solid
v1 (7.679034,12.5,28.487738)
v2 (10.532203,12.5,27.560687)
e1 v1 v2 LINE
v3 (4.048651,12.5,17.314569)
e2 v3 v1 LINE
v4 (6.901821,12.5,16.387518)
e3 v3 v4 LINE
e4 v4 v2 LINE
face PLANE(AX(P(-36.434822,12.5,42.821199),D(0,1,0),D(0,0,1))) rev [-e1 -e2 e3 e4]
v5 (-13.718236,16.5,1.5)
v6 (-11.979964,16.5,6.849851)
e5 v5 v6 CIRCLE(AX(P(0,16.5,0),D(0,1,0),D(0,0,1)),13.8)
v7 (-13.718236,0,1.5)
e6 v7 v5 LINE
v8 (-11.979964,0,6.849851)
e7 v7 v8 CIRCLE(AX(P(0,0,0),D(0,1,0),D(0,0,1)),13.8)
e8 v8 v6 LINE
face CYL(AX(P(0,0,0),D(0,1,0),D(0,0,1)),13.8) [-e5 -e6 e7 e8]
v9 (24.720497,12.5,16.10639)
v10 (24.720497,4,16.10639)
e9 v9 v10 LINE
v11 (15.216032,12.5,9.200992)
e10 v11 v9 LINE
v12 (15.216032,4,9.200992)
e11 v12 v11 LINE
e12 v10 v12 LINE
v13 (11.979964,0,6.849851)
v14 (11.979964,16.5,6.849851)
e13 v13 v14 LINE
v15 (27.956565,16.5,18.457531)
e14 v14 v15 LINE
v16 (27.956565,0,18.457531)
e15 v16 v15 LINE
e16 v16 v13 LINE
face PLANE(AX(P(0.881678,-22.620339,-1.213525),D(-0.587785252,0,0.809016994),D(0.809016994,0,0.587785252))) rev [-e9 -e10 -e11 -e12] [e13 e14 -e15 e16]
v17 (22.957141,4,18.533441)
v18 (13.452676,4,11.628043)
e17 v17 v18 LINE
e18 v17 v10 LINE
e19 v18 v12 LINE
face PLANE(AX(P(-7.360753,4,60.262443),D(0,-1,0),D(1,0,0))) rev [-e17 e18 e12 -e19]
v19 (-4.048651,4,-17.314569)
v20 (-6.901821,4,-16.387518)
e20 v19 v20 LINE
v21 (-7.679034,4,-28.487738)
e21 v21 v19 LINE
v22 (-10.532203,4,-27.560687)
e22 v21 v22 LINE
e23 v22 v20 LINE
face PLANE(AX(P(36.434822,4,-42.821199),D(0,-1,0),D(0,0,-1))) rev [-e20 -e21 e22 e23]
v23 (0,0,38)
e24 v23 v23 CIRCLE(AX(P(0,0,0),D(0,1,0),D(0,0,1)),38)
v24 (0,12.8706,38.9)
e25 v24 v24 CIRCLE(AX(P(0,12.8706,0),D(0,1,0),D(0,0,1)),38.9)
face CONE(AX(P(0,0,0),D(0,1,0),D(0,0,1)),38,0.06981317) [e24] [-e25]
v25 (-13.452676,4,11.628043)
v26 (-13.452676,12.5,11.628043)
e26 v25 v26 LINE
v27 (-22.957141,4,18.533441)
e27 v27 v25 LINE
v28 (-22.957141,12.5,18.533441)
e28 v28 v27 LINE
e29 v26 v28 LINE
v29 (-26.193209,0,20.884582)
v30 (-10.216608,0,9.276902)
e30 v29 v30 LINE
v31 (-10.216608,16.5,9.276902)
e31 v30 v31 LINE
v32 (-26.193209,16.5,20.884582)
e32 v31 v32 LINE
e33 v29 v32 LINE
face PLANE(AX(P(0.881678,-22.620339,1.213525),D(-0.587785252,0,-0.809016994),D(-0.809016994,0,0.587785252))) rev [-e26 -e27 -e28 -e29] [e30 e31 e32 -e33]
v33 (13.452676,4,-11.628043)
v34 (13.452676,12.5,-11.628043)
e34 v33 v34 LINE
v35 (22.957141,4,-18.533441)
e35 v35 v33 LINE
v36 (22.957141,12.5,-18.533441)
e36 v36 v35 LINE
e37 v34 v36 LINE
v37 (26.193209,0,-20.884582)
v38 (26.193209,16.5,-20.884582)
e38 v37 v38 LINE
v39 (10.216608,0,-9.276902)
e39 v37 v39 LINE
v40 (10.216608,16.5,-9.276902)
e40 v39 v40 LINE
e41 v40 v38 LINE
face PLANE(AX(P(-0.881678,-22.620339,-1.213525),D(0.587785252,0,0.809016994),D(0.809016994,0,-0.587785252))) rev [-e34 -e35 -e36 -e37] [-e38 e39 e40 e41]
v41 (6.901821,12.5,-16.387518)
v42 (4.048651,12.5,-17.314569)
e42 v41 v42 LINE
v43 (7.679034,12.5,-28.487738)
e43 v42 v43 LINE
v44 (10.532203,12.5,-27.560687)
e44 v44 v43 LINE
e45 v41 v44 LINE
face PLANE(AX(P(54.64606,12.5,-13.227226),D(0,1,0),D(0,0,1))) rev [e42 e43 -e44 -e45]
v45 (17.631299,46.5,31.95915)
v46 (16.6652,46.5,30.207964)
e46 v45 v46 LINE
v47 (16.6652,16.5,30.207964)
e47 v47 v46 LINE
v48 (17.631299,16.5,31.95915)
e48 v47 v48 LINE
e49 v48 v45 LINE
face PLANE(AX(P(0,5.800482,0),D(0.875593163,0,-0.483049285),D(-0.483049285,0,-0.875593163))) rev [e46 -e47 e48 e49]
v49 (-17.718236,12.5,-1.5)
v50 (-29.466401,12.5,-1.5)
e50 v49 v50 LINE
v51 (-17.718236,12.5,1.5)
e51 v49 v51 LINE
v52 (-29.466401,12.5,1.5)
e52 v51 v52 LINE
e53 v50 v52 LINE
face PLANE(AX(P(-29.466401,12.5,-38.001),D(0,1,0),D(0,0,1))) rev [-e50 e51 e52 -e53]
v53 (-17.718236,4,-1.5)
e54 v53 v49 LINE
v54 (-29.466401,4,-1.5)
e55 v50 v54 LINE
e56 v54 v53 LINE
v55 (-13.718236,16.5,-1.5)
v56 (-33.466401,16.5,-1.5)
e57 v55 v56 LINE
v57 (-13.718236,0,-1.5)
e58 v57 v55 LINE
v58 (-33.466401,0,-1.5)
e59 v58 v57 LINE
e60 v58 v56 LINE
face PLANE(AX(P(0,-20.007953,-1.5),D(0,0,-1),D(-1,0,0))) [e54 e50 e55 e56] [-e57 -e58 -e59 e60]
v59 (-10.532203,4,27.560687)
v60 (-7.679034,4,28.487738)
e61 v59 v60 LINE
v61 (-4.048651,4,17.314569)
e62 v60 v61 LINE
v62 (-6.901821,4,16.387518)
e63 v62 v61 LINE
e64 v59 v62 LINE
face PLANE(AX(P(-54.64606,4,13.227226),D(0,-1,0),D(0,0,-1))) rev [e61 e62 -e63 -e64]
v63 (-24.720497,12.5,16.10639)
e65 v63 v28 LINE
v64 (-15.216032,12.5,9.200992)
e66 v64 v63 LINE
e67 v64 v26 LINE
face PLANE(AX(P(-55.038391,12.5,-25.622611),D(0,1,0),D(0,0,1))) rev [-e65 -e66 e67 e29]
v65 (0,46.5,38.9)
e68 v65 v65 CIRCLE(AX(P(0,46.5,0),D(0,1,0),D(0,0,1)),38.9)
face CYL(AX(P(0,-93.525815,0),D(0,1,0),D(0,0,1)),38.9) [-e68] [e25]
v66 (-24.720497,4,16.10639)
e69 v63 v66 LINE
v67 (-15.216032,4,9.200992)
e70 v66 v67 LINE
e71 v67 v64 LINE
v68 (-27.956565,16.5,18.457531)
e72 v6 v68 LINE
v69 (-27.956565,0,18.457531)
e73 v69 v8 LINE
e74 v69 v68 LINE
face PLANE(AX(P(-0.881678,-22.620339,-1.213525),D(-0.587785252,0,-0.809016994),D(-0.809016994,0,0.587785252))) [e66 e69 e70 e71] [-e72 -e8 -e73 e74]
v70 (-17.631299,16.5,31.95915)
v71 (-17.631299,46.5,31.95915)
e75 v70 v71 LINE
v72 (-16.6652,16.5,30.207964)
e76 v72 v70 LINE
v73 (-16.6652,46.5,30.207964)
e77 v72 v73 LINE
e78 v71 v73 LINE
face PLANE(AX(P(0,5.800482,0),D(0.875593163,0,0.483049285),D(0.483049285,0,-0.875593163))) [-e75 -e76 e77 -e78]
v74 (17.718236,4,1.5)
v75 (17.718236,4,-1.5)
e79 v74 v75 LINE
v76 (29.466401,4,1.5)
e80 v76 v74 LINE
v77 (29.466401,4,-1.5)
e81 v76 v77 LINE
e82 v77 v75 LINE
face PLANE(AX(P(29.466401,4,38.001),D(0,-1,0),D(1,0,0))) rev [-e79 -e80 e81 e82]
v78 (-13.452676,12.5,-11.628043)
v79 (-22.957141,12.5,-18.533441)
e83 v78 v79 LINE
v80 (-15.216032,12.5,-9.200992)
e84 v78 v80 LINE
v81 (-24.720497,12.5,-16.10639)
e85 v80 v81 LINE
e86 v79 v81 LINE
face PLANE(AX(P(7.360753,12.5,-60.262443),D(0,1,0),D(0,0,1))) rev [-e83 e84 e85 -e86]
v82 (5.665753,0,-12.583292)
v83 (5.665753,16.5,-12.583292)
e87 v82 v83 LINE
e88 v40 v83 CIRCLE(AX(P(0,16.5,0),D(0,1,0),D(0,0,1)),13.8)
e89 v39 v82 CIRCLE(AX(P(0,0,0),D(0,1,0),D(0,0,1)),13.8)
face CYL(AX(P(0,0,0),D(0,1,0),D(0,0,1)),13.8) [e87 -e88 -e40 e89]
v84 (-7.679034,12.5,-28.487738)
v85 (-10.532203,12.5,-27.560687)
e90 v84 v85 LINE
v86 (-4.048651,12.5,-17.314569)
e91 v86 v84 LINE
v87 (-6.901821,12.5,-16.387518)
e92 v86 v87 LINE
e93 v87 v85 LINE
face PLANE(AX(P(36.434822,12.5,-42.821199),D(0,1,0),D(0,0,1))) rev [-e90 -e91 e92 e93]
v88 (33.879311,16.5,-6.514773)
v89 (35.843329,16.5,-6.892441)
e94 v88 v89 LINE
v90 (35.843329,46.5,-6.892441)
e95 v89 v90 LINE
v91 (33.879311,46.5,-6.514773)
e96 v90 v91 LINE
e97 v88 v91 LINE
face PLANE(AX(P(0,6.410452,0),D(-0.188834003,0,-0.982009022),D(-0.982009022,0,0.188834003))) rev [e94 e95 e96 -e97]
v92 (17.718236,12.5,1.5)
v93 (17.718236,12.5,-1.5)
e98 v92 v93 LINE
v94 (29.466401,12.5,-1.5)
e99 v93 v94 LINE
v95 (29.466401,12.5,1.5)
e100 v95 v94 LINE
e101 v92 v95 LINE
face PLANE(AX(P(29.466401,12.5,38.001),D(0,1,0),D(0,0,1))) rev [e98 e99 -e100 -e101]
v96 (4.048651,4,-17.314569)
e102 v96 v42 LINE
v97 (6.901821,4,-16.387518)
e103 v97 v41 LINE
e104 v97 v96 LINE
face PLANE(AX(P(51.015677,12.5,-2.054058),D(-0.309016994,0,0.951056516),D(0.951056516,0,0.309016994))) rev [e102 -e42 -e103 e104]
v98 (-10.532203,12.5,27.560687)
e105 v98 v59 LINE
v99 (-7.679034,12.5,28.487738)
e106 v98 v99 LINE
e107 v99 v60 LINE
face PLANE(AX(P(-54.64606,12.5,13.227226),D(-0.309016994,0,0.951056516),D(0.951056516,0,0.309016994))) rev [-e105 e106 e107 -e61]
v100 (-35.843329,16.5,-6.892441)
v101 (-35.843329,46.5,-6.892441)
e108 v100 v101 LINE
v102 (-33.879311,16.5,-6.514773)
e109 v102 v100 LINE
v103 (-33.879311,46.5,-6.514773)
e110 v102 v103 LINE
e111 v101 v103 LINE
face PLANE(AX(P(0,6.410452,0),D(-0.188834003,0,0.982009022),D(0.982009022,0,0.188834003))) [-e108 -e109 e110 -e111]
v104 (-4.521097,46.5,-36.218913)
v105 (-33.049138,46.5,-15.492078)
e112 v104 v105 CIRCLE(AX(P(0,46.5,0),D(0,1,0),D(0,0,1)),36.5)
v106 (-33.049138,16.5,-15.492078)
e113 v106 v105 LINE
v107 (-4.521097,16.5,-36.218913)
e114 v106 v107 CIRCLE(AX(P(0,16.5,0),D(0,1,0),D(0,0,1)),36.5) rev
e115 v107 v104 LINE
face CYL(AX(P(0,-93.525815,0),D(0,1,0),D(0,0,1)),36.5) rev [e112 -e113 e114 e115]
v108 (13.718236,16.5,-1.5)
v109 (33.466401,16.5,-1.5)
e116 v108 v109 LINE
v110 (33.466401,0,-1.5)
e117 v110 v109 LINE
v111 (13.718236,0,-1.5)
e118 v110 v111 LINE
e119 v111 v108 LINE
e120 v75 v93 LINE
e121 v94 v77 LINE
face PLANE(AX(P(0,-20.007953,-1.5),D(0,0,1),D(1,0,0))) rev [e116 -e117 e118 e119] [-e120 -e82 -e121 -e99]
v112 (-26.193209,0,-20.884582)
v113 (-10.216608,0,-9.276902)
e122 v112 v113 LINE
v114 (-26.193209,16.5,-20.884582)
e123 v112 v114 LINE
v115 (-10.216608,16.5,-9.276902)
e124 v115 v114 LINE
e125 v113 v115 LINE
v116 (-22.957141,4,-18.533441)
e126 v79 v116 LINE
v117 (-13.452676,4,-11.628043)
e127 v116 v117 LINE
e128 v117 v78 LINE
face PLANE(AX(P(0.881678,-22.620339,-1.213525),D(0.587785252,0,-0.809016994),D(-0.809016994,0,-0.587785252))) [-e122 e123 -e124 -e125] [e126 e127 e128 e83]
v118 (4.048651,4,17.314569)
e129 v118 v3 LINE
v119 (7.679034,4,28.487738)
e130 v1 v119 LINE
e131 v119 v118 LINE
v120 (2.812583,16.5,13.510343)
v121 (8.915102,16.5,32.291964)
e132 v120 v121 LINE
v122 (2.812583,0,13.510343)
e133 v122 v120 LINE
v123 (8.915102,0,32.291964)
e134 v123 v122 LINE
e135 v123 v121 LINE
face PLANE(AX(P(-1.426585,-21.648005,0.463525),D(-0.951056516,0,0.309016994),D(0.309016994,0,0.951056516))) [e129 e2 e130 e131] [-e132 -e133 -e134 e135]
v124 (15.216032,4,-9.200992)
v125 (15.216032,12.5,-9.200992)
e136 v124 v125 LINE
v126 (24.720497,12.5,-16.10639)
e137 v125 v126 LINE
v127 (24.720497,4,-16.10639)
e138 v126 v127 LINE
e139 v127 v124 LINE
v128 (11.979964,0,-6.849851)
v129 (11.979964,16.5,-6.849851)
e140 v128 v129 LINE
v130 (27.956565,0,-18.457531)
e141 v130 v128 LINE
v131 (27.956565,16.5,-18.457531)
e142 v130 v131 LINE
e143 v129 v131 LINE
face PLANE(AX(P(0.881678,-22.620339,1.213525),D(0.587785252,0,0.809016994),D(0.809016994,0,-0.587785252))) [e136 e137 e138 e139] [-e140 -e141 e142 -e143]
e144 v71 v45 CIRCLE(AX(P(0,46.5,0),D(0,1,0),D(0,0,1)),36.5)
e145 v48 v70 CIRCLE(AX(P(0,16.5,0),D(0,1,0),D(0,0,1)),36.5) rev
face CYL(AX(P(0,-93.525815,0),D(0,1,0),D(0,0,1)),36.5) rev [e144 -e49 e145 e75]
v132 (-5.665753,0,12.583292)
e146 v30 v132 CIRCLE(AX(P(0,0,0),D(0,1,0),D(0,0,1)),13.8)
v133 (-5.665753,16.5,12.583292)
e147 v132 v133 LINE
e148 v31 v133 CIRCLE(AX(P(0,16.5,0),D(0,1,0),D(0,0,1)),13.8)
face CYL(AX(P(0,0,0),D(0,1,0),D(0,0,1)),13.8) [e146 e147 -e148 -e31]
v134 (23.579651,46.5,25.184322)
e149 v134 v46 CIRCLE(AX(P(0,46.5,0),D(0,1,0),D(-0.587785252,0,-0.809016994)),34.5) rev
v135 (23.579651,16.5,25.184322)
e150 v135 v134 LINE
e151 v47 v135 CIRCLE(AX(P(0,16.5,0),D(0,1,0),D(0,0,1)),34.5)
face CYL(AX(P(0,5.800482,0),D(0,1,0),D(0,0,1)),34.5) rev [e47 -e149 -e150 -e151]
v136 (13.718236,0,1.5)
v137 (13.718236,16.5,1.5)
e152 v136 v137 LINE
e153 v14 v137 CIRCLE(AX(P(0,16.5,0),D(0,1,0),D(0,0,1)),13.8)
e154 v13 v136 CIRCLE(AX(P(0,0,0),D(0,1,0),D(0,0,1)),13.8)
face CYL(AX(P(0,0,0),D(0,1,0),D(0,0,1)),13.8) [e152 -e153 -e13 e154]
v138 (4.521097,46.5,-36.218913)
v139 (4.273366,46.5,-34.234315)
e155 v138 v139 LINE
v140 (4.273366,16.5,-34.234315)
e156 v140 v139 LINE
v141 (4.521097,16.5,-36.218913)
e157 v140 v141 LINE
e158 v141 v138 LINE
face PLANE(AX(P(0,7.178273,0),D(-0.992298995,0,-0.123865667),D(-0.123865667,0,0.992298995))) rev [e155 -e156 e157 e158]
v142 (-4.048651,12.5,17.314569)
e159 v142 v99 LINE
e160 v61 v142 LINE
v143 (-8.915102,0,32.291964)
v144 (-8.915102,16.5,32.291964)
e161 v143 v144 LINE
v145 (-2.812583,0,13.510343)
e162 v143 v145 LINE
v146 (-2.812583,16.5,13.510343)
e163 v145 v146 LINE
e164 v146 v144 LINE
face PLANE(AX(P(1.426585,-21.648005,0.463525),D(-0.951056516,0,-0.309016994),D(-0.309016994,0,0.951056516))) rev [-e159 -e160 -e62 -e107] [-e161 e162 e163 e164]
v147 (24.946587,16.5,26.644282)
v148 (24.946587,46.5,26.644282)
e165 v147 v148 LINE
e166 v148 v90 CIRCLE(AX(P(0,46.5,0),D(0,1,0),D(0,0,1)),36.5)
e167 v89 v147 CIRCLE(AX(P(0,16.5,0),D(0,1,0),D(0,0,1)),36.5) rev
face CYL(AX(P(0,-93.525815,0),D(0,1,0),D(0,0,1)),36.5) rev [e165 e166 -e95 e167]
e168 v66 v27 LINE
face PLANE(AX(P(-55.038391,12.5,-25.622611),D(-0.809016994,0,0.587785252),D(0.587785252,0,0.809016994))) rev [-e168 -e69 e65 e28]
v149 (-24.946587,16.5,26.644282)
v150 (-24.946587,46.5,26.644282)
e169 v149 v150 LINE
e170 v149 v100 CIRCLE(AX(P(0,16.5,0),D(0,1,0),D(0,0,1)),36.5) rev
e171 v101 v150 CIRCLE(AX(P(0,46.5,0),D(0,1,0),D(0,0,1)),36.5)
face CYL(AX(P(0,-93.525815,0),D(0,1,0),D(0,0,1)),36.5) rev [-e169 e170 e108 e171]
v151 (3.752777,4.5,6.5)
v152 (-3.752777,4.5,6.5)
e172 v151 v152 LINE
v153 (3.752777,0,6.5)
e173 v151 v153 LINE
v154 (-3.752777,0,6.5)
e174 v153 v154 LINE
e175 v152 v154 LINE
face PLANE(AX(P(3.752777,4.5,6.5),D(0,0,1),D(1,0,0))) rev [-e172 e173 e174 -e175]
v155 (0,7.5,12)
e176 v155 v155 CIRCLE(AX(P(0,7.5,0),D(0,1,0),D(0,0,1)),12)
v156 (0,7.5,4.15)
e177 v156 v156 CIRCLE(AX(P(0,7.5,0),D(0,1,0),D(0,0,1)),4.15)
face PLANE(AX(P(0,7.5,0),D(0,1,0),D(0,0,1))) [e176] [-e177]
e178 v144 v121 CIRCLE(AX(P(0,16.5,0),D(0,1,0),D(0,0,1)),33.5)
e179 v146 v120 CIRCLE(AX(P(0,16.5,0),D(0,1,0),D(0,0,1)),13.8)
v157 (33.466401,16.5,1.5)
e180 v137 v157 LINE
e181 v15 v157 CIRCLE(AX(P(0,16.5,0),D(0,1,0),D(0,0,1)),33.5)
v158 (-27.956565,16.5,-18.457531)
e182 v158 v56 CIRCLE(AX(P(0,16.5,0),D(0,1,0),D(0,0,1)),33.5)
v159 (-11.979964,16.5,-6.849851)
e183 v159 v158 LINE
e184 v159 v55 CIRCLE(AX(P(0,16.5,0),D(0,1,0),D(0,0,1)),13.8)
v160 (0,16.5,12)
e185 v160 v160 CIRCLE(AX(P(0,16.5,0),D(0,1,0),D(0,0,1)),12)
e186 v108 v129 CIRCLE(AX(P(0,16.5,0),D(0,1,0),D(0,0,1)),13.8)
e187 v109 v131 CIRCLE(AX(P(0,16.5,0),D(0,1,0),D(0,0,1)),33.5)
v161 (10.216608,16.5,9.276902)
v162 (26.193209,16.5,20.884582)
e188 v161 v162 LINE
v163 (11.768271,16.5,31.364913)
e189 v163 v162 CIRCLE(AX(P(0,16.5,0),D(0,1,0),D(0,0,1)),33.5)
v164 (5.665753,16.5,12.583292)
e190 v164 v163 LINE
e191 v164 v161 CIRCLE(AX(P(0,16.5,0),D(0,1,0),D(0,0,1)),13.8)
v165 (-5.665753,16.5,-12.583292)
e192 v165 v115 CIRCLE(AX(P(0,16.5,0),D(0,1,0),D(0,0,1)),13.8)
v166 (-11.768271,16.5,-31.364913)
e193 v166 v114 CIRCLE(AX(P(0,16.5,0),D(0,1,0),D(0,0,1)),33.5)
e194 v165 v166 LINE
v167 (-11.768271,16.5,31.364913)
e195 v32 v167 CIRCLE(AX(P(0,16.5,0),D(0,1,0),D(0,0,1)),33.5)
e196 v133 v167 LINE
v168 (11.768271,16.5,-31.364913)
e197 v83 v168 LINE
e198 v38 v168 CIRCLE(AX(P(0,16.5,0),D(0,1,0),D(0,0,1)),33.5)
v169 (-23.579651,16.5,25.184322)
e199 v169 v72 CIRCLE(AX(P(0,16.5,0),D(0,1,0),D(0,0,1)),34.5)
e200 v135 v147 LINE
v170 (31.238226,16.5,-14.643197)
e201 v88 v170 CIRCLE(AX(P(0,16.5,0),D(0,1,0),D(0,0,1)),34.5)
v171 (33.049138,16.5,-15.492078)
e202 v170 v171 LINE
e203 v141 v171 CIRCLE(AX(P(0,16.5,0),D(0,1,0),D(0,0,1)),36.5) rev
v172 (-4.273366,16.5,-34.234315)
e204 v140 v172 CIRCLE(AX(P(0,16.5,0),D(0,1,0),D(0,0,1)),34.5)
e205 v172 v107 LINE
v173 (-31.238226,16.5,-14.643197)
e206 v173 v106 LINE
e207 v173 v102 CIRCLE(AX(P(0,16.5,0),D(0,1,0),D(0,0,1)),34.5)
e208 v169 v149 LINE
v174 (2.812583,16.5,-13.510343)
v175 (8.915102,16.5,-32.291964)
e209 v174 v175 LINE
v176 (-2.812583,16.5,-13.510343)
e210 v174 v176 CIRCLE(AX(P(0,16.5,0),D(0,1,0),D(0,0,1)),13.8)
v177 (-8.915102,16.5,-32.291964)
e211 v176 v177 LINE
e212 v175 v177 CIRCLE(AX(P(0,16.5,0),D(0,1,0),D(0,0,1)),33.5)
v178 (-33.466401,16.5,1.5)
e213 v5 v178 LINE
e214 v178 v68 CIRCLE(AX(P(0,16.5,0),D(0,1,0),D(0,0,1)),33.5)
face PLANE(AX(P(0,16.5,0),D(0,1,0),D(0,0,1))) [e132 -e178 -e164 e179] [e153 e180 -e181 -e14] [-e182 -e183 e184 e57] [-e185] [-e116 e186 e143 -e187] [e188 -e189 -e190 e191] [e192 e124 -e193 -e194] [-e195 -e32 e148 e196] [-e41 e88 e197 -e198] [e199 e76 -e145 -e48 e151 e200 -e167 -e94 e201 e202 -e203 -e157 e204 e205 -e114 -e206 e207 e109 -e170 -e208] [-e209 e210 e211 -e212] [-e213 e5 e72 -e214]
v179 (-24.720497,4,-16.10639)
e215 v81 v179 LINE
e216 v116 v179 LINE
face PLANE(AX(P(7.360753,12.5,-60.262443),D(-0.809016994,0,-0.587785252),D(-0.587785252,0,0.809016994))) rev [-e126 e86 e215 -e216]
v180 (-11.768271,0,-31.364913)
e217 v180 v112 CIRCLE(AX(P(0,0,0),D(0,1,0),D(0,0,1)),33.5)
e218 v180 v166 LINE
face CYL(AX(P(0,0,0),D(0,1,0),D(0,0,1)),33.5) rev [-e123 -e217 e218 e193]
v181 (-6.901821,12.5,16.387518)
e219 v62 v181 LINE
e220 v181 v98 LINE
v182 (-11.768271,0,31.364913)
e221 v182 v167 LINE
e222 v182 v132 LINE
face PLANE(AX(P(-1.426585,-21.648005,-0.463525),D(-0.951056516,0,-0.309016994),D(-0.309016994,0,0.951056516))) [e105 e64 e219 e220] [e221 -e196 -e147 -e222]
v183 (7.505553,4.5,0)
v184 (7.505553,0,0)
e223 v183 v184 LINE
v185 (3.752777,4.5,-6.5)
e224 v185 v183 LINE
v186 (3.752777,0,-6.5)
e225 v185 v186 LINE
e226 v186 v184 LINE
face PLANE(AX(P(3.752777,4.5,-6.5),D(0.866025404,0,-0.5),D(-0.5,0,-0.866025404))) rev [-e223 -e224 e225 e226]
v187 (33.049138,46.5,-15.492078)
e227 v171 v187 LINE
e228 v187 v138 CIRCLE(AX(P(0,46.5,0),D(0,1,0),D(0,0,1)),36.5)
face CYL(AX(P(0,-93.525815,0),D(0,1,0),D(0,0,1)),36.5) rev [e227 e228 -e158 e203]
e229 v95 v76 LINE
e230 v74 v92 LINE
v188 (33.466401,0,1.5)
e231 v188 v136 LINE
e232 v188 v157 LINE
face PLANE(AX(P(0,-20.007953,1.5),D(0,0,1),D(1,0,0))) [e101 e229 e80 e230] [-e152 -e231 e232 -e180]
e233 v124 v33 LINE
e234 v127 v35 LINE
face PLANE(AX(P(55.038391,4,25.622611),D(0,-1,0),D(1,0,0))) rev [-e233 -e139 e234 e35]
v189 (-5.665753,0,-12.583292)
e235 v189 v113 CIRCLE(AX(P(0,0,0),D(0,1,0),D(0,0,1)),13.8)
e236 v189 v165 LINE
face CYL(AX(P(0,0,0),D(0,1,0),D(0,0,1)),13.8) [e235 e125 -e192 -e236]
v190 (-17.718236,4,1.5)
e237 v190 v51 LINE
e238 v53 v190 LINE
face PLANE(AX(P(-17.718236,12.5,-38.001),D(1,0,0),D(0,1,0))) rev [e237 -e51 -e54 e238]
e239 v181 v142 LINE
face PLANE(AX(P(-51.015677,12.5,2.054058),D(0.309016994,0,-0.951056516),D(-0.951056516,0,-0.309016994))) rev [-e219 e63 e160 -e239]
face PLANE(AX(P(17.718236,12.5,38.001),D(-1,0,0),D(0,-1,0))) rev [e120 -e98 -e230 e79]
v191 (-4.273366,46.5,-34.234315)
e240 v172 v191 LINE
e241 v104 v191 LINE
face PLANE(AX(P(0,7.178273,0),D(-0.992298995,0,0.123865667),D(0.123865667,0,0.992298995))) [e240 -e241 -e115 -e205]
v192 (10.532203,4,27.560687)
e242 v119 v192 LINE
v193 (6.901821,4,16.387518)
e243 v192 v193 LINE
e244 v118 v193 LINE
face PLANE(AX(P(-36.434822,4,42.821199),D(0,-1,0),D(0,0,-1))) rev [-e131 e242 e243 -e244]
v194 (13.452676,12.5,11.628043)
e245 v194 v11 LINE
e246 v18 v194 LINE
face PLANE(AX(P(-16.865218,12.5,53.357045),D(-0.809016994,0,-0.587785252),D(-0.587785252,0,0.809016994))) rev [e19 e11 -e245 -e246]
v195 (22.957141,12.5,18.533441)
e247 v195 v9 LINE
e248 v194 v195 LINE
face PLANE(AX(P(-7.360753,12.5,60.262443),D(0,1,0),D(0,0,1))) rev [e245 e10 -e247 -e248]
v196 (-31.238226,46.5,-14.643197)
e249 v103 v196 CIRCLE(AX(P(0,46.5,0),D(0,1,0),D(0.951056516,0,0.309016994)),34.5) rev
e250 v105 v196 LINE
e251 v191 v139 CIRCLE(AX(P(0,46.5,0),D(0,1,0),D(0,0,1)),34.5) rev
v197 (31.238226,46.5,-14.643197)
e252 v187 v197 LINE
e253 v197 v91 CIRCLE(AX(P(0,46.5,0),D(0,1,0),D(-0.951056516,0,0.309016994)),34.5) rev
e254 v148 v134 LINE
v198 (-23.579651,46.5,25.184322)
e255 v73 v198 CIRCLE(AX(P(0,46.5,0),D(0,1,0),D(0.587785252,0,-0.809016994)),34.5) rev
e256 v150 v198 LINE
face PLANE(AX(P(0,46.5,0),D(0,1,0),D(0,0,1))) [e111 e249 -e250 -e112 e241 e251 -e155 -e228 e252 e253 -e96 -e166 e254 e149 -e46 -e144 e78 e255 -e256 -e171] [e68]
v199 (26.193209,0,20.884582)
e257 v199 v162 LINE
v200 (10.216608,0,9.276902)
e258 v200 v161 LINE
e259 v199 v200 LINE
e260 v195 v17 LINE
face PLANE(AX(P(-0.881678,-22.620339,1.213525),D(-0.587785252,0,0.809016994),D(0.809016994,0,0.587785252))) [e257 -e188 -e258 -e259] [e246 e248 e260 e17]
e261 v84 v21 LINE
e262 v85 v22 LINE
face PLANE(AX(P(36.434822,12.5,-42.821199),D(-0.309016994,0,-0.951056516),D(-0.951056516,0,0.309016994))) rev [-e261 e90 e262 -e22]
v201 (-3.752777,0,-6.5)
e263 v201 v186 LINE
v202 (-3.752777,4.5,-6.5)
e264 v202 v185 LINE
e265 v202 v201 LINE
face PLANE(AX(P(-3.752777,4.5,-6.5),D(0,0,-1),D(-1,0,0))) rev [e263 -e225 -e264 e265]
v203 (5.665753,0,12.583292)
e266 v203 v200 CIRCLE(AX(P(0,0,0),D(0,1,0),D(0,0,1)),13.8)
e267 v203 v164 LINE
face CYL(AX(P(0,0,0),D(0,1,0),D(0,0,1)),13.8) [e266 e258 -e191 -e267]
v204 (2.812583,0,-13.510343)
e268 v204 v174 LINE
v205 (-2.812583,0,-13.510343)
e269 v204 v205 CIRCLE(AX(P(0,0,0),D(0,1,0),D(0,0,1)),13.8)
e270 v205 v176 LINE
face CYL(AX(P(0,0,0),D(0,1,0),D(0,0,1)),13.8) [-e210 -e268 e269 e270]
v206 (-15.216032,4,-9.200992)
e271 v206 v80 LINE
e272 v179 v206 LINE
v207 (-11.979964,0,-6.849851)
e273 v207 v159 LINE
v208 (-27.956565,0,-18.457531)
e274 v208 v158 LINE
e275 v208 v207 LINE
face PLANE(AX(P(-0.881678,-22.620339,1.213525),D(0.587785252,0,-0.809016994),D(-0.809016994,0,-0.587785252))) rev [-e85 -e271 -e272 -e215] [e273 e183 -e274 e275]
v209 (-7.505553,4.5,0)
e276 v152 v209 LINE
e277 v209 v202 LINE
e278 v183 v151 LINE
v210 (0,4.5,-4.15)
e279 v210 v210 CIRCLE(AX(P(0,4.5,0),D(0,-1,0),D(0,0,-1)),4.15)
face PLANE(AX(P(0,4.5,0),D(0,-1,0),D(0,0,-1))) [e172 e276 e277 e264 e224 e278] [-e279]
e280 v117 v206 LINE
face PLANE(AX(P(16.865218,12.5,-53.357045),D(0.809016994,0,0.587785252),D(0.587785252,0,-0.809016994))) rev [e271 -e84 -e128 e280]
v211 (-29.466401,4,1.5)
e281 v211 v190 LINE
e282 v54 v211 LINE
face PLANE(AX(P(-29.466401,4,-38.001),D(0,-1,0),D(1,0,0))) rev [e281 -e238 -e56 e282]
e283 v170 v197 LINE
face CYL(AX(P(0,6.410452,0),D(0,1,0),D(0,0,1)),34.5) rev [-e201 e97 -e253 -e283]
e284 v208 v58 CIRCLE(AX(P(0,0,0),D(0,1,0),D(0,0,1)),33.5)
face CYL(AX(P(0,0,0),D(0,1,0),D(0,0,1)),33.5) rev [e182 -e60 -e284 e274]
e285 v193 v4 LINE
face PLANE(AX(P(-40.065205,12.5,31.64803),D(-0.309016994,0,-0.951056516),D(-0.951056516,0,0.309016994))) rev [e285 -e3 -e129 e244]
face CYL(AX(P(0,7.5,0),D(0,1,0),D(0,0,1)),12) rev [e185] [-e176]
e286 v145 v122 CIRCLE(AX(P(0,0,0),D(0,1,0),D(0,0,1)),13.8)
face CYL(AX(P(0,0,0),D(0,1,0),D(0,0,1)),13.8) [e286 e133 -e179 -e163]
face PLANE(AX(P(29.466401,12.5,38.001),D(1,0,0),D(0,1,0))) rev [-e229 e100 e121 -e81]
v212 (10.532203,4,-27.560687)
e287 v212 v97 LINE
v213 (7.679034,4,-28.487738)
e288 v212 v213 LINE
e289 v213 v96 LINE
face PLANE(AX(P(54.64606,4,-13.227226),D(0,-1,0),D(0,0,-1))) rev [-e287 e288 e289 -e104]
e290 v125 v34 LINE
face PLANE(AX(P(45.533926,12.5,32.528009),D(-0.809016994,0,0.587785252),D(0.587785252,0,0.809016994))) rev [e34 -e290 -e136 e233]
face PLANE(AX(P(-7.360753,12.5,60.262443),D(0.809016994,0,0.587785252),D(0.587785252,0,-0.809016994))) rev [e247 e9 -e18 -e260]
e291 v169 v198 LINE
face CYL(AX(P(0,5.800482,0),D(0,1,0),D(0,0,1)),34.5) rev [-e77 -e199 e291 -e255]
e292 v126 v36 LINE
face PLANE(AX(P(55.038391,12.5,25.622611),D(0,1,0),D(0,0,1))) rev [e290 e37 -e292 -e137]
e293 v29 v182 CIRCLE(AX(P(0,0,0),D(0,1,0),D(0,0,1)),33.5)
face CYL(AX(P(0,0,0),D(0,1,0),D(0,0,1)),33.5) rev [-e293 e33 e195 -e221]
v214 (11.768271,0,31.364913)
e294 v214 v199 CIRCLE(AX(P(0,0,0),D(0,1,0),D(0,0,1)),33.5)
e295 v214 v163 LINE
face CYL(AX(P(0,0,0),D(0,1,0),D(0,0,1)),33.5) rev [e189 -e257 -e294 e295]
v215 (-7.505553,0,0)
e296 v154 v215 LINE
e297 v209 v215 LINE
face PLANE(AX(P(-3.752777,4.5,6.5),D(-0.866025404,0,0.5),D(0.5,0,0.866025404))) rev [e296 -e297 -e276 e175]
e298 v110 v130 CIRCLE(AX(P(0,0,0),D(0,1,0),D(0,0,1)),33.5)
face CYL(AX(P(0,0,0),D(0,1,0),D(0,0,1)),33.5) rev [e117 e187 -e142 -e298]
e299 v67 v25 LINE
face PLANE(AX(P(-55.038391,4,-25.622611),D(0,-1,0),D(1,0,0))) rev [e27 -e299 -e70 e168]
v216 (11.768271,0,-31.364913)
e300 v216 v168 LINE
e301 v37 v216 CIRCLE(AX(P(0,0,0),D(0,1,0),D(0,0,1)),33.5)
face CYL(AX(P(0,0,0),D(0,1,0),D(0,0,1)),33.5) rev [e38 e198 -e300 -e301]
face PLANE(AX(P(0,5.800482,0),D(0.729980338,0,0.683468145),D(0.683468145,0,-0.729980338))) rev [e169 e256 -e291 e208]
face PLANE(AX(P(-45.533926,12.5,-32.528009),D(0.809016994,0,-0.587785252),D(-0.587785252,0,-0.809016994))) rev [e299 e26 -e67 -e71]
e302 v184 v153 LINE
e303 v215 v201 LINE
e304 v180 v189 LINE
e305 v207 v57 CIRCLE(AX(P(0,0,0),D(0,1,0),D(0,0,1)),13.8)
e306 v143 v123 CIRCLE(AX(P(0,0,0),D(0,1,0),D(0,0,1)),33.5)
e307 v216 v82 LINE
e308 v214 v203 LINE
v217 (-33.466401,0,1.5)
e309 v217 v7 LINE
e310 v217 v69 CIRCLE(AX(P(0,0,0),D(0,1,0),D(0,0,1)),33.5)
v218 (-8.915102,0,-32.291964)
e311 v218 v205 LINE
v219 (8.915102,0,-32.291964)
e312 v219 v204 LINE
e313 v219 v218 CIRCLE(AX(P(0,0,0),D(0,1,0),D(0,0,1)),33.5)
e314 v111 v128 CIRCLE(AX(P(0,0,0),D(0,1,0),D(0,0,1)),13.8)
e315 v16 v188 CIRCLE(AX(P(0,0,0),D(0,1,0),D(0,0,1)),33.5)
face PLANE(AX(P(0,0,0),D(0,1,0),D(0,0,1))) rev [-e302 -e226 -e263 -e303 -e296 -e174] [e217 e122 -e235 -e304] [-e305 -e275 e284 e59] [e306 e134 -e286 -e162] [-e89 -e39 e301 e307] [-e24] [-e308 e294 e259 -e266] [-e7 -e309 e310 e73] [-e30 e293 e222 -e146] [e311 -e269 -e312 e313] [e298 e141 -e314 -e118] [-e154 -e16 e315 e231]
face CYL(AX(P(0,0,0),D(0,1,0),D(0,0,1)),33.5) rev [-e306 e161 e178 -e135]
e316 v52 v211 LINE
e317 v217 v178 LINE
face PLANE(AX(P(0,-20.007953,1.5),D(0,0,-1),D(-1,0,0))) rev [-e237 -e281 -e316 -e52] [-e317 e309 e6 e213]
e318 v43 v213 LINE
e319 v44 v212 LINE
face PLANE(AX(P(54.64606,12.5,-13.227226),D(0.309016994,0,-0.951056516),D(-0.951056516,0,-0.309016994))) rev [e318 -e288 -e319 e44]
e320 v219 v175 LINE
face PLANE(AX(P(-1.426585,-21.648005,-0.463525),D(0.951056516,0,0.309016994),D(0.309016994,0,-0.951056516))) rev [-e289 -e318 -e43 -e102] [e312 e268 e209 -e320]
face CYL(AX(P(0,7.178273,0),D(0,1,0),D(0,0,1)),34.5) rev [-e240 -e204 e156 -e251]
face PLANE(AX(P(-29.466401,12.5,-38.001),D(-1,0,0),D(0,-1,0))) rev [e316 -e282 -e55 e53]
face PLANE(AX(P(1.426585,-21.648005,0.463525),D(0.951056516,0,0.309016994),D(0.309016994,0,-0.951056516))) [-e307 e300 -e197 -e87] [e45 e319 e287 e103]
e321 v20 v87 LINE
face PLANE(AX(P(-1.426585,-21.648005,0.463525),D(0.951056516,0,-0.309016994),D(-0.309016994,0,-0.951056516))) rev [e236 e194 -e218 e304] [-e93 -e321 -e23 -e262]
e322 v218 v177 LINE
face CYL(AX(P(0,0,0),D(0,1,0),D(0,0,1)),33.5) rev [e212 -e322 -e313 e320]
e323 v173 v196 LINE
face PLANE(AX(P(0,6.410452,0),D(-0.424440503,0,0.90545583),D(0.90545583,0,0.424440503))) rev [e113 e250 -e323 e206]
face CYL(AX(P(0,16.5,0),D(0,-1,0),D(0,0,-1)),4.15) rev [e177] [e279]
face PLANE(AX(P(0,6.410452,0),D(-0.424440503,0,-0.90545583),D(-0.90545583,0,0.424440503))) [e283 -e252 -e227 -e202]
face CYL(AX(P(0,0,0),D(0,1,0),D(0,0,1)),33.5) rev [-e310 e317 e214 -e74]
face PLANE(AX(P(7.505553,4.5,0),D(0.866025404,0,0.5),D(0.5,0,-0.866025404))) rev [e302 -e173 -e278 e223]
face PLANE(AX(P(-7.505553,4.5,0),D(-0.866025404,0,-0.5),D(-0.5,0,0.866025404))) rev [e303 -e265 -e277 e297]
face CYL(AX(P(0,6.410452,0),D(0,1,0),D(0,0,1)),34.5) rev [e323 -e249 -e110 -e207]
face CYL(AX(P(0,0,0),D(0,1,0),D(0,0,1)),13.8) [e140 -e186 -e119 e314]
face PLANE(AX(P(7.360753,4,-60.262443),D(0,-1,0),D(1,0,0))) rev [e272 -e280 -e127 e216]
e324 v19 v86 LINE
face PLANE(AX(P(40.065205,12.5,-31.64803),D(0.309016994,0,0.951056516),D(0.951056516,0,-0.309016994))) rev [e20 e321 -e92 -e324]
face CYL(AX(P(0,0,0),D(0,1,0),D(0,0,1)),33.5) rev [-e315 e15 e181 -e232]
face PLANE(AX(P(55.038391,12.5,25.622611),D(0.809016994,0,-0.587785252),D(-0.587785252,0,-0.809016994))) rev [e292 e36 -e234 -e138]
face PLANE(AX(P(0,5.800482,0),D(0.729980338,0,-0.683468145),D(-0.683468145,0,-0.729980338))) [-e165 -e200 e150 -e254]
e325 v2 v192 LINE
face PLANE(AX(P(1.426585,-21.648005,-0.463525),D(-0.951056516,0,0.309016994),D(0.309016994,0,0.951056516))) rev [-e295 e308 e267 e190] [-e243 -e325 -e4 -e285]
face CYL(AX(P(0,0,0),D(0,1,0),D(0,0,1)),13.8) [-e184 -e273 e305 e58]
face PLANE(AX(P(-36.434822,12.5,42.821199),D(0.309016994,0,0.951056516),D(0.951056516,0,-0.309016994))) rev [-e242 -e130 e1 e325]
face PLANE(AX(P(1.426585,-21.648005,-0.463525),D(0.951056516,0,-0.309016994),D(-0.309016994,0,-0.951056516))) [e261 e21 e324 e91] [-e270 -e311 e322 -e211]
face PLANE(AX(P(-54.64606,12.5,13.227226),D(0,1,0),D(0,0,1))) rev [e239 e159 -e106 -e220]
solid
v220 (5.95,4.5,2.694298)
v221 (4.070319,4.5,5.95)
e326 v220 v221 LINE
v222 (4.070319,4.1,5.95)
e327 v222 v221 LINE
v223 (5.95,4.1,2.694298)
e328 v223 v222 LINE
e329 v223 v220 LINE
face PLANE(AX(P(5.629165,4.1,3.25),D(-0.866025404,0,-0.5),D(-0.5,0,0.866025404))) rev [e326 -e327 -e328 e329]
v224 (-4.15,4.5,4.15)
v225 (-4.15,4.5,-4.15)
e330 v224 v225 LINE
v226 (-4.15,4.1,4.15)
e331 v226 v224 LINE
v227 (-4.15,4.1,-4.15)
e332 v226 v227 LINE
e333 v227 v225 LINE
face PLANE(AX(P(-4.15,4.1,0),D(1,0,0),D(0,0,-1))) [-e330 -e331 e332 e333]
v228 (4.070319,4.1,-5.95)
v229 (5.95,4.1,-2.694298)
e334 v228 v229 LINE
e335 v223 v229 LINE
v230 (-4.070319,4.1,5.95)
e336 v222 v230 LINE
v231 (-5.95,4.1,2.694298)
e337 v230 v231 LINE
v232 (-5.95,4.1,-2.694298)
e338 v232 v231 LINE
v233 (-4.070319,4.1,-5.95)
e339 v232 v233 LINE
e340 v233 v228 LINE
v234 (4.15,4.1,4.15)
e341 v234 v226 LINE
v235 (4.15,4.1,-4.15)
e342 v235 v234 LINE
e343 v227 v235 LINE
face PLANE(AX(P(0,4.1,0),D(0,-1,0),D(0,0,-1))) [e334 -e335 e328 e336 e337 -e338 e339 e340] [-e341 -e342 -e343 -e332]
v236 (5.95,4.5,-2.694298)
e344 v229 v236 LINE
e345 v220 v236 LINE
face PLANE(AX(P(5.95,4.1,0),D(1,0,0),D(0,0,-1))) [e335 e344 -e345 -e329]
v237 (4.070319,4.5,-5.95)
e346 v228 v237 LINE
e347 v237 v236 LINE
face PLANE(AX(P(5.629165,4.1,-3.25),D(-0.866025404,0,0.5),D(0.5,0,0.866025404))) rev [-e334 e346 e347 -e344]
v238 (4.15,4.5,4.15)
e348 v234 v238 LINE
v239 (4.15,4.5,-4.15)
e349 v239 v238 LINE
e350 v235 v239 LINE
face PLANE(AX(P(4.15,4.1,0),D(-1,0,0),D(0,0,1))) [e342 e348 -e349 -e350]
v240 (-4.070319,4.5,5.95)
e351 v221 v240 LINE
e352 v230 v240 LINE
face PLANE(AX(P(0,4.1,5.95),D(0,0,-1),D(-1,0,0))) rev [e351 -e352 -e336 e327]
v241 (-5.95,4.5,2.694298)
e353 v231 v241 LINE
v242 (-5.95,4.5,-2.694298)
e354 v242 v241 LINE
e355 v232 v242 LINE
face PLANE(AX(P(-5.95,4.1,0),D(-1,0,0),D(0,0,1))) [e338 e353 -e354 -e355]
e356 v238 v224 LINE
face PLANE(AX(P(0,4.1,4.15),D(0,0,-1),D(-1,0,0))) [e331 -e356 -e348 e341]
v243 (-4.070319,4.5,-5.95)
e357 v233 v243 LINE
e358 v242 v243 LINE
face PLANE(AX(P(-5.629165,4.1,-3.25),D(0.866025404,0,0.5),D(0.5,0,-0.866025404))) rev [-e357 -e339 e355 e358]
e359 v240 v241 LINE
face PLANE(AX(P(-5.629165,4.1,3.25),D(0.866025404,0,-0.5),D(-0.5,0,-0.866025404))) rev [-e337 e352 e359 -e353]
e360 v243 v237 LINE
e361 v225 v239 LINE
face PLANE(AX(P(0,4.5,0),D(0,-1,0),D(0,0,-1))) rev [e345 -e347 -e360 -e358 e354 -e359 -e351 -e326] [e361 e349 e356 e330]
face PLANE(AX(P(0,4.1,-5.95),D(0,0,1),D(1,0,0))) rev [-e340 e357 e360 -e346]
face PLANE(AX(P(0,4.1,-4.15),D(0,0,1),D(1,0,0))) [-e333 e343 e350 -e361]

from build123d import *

# Parameters (mm, degrees)
BOSS_EXTRUDE1_DEPTH    = 16.5
SKETCH1_3_R            = 38
BOSS_EXTRUDE2_DEPTH    = 29.5
CHAMFER1_SIZE          = 1
CUT_EXTRUDE1_DEPTH     = 4.5
SKETCH3_R              = 12
CUT_EXTRUDE2_DEPTH     = 9
SKETCH4_R              = 4.15
CUT_EXTRUDE3_DEPTH     = 57.216100896
SKETCH5_R              = 33.5
SKETCH5_R_2            = 13.8
CUT_EXTRUDE4_DEPTH     = 57.216100896
SKETCH8_W              = 8.3
SKETCH8_H              = 8.3
BOSS_EXTRUDE5_DEPTH    = 0.4
BOSS_EXTRUDE6_DEPTH    = 16.5
SKETCH6_W              = 11.748165023
SKETCH6_H              = 8.5
CUT_EXTRUDE5_DEPTH     = 3
CIRPATTERN1_COUNT      = 10
CIRPATTERN1_2_COUNT    = 10
INTERSECT1_START       = 16.5
INTERSECT1_OUTLINE_R   = 38
INTERSECT1_OUTLINE_R_2 = 35
INTERSECT1_DEPTH       = 13
SKETCH9_R              = 38.9
SKETCH9_R_2            = 36.5
ADAPTER_WALL_DEPTH     = 30
GROOVE_DEPTH           = 30
CIRPATTERN2_COUNT      = 5


# Read off the part's stored shape, not the designer's step: Intersect1, Draft4
with BuildPart() as part:
    # Sketch1 → Boss-Extrude1 (new body)
    with BuildSketch(Plane(origin=(0, 0, 0), x_dir=(1, 0, 0), z_dir=(0, 1, 0))):
        with BuildLine():
            ThreePointArc((-35, 0), (-23.807565896, -25.655405007), (2.611417491, -34.902442589))
            ThreePointArc((2.611417491, -34.902442589), (25.1391934, -24.352021583), (34.967837614, -1.50011086))
            ThreePointArc((34.967837614, -1.50011086), (26.159850954, 23.252143945), (2.611487723, 34.902437334))
            ThreePointArc((2.611487723, 34.902437334), (-23.807540084, 25.65542896), (-35, 0))
        make_face()
        with BuildLine():
            Line((-2.610578379, 3.226047199), (0, 3.226047199))
            Line((0, 3.226047199), (2.610578379, 3.226047199))
            ThreePointArc((2.610578379, 3.226047199), (0, -4.15), (-2.610578379, 3.226047199))
        make_face(mode=Mode.SUBTRACT)
    extrude(amount=BOSS_EXTRUDE1_DEPTH)

    # Sketch1<3> → Boss-Extrude2 (add)
    with BuildSketch(Plane(origin=(0, 0, 0), x_dir=(1, 0, 0), z_dir=(0, 1, 0))):
        with Locations(Location((0, 0, 0), (0, 0, 270))):
            Circle(SKETCH1_3_R)
        with BuildLine():
            ThreePointArc((34.967837614, -1.50011086), (25.1391934, -24.352021583), (2.611417491, -34.902442589))
            ThreePointArc((2.611417491, -34.902442589), (-23.807565896, -25.655405007), (-35, 0))
            ThreePointArc((-35, 0), (-23.807540084, 25.65542896), (2.611487723, 34.902437334))
            ThreePointArc((2.611487723, 34.902437334), (25.65542896, 23.807540084), (35, 0))
            ThreePointArc((35, 0), (34.99195848, -0.7502278), (34.967837614, -1.50011086))
        make_face(mode=Mode.SUBTRACT)
    extrude(amount=BOSS_EXTRUDE2_DEPTH)

    # Chamfer1
    chamfer1_edges = [part.edges().sort_by_distance(p)[0] for p in [
        (0, 0, -3.226047199),
        (0, 0, 4.15),
    ]]
    chamfer(chamfer1_edges, length=CHAMFER1_SIZE)

    # Sketch2 → Cut-Extrude1 (cut)
    with BuildSketch(Plane.XZ):
        Polygon((-3.75277675, 6.5), (-7.505553499, 0), (-3.75277675, -6.5), (3.75277675, -6.5), (7.505553499, 0), (3.75277675, 6.5), align=None)
    extrude(amount=-CUT_EXTRUDE1_DEPTH, mode=Mode.SUBTRACT)

    # Sketch3 → Cut-Extrude2 (cut)
    with BuildSketch(Plane(origin=(0, 16.5, 0), x_dir=(1, 0, 0), z_dir=(0, 1, 0))):
        with Locations(Location((0, 0, 0), (0, 0, 270))):
            Circle(SKETCH3_R)
    extrude(amount=-CUT_EXTRUDE2_DEPTH, mode=Mode.SUBTRACT)

    # Sketch4 → Cut-Extrude3 (cut, through all)
    with BuildSketch(Plane(origin=(0, 16.5, 0), x_dir=(1, 0, 0), z_dir=(0, 1, 0))):
        with Locations(Location((0, 0, 0), (0, 0, 90))):
            Circle(SKETCH4_R)
    extrude(amount=-CUT_EXTRUDE3_DEPTH, mode=Mode.SUBTRACT)

    # Sketch5 → Cut-Extrude4 (cut, through all)
    with BuildSketch(Plane(origin=(0, 16.5, 0), x_dir=(1, 0, 0), z_dir=(0, 1, 0))):
        with Locations(Location((0, 0, 0), (0, 0, 270))):
            Circle(SKETCH5_R)
        with Locations(Location((0, 0, 0), (0, 0, 270))):
            Circle(SKETCH5_R_2, mode=Mode.SUBTRACT)
    extrude(amount=-CUT_EXTRUDE4_DEPTH, mode=Mode.SUBTRACT)


with BuildPart() as cut_extrude4_piece_1:
    # of the separate pieces the step leaves, piece 1, a body of its own (cut_extrude4_pieces)
    add(part.part.solids().sort_by_distance((0, 0, 38))[0])

    # Sketch5<3> → Boss-Extrude6 (add)
    with BuildSketch(Plane(origin=(0, 16.5, 0), x_dir=(1, 0, 0), z_dir=(0, 1, 0))):
        with BuildLine():
            Line((33.5, 0), (13.8, 0))
            ThreePointArc((13.8, 0), (13.779543848, -0.751113398), (13.718236038, -1.5))
            Line((13.718236038, -1.5), (33.466401061, -1.5))
            ThreePointArc((33.466401061, -1.5), (33.491599212, -0.750188125), (33.5, 0))
        make_face()
        with BuildLine():
            ThreePointArc((13.718236038, 1.5), (13.779543848, 0.751113398), (13.8, 0))
            Line((13.8, 0), (33.5, 0))
            ThreePointArc((33.5, 0), (33.491599212, 0.750188125), (33.466401061, 1.5))
            Line((33.466401061, 1.5), (13.718236038, 1.5))
        make_face()
    boss_extrude6 = extrude(amount=-BOSS_EXTRUDE6_DEPTH)

    # Sketch6 → Cut-Extrude5 (cut)
    with BuildSketch(Plane(origin=(-0.880879479, 0, -1.5), x_dir=(-1, 0, 0), z_dir=(0, 0, -1))):
        with Locations((-24.473198029, 8.25)):
            Rectangle(SKETCH6_W, SKETCH6_H)
    cut_extrude5 = extrude(amount=-CUT_EXTRUDE5_DEPTH, mode=Mode.SUBTRACT)

    # CirPattern1: Boss-Extrude6 ×10 about axis
    cirpattern1_axis = Axis((0, 0, 0), (0, 1, 0))
    for i in range(1, CIRPATTERN1_COUNT):
        add(boss_extrude6.rotate(cirpattern1_axis, i * 360 / CIRPATTERN1_COUNT))

    # CirPattern1 2: Cut-Extrude5 ×10 about axis
    cirpattern1_2_axis = Axis((0, 0, 0), (0, 1, 0))
    for i in range(1, CIRPATTERN1_2_COUNT):
        add(cut_extrude5.rotate(cirpattern1_2_axis, i * 360 / CIRPATTERN1_2_COUNT), mode=Mode.SUBTRACT)

    # Intersect1 outline → Intersect1 (cut)
    with BuildSketch(Plane(origin=(0, 0, 0), x_dir=(1, 0, 0), z_dir=(0, 1, 0)).offset(INTERSECT1_START)):
        Circle(INTERSECT1_OUTLINE_R)
        Circle(INTERSECT1_OUTLINE_R_2, mode=Mode.SUBTRACT)
    extrude(amount=INTERSECT1_DEPTH, mode=Mode.SUBTRACT)


with BuildPart() as cut_extrude4_piece_2:
    # of the separate pieces the step leaves, piece 2, a body of its own (cut_extrude4_pieces)
    add(part.part.solids().sort_by_distance((2.610578379, 4.5, -3.226047199))[0])


    add(cut_extrude4_piece_1.part)  # Adapter_Wall merges Cut-Extrude4 piece 1
    # Sketch9 → Adapter_Wall (add)
    with BuildSketch(Plane(origin=(0, 46.5, 0), x_dir=(1, 0, 0), z_dir=(0, 1, 0))):
        with Locations(Location((0, 0, 0), (0, 0, 270))):
            Circle(SKETCH9_R)
        with Locations(Location((0, 0, 0), (0, 0, 270))):
            Circle(SKETCH9_R_2, mode=Mode.SUBTRACT)
    extrude(amount=-ADAPTER_WALL_DEPTH)

    # Sketch9<3> → Groove (add)
    with BuildSketch(Plane(origin=(0, 46.5, 0), x_dir=(1, 0, 0), z_dir=(0, 1, 0))):
        with BuildLine():
            ThreePointArc((4.521096859, 36.218913335), (0, 36.5), (-4.521096859, 36.218913335))
            Line((-4.521096859, 36.218913335), (-4.273365524, 34.234315344))
            ThreePointArc((-4.273365524, 34.234315344), (0, 34.5), (4.273365524, 34.234315344))
            Line((4.273365524, 34.234315344), (4.521096859, 36.218913335))
        make_face()
    groove = extrude(amount=-GROOVE_DEPTH)

    # CirPattern2: Groove ×5 about axis
    cirpattern2_axis = Axis((0, 0, 0), (0, 1, 0))
    for i in range(1, CIRPATTERN2_COUNT):
        add(groove.rotate(cirpattern2_axis, i * 360 / CIRPATTERN2_COUNT))

    # Draft4 outline → Draft4 (revolve)
    with BuildSketch(Plane.XY):
        Polygon((38, 16.5), (38, 0), (38.9, 12.870599631), (38.9, 16.5), align=None)
    revolve(axis=Axis((0, 0, 0), (0, 1, 0)))


with BuildPart() as body_3:
    # Sketch8 → Boss-Extrude5 (new body)
    with BuildSketch(Plane.XZ.offset(-4.5)):
        Polygon((4.070319398, -5.95), (5.95, -2.694297695), (5.95, 2.694297695), (4.070319398, 5.95), (-4.070319398, 5.95), (-5.95, 2.694297695), (-5.95, -2.694297695), (-4.070319398, -5.95), align=None)
        Rectangle(SKETCH8_W, SKETCH8_H, mode=Mode.SUBTRACT)
    extrude(amount=BOSS_EXTRUDE5_DEPTH)


solid = Compound([cut_extrude4_piece_2.part, body_3.part])
